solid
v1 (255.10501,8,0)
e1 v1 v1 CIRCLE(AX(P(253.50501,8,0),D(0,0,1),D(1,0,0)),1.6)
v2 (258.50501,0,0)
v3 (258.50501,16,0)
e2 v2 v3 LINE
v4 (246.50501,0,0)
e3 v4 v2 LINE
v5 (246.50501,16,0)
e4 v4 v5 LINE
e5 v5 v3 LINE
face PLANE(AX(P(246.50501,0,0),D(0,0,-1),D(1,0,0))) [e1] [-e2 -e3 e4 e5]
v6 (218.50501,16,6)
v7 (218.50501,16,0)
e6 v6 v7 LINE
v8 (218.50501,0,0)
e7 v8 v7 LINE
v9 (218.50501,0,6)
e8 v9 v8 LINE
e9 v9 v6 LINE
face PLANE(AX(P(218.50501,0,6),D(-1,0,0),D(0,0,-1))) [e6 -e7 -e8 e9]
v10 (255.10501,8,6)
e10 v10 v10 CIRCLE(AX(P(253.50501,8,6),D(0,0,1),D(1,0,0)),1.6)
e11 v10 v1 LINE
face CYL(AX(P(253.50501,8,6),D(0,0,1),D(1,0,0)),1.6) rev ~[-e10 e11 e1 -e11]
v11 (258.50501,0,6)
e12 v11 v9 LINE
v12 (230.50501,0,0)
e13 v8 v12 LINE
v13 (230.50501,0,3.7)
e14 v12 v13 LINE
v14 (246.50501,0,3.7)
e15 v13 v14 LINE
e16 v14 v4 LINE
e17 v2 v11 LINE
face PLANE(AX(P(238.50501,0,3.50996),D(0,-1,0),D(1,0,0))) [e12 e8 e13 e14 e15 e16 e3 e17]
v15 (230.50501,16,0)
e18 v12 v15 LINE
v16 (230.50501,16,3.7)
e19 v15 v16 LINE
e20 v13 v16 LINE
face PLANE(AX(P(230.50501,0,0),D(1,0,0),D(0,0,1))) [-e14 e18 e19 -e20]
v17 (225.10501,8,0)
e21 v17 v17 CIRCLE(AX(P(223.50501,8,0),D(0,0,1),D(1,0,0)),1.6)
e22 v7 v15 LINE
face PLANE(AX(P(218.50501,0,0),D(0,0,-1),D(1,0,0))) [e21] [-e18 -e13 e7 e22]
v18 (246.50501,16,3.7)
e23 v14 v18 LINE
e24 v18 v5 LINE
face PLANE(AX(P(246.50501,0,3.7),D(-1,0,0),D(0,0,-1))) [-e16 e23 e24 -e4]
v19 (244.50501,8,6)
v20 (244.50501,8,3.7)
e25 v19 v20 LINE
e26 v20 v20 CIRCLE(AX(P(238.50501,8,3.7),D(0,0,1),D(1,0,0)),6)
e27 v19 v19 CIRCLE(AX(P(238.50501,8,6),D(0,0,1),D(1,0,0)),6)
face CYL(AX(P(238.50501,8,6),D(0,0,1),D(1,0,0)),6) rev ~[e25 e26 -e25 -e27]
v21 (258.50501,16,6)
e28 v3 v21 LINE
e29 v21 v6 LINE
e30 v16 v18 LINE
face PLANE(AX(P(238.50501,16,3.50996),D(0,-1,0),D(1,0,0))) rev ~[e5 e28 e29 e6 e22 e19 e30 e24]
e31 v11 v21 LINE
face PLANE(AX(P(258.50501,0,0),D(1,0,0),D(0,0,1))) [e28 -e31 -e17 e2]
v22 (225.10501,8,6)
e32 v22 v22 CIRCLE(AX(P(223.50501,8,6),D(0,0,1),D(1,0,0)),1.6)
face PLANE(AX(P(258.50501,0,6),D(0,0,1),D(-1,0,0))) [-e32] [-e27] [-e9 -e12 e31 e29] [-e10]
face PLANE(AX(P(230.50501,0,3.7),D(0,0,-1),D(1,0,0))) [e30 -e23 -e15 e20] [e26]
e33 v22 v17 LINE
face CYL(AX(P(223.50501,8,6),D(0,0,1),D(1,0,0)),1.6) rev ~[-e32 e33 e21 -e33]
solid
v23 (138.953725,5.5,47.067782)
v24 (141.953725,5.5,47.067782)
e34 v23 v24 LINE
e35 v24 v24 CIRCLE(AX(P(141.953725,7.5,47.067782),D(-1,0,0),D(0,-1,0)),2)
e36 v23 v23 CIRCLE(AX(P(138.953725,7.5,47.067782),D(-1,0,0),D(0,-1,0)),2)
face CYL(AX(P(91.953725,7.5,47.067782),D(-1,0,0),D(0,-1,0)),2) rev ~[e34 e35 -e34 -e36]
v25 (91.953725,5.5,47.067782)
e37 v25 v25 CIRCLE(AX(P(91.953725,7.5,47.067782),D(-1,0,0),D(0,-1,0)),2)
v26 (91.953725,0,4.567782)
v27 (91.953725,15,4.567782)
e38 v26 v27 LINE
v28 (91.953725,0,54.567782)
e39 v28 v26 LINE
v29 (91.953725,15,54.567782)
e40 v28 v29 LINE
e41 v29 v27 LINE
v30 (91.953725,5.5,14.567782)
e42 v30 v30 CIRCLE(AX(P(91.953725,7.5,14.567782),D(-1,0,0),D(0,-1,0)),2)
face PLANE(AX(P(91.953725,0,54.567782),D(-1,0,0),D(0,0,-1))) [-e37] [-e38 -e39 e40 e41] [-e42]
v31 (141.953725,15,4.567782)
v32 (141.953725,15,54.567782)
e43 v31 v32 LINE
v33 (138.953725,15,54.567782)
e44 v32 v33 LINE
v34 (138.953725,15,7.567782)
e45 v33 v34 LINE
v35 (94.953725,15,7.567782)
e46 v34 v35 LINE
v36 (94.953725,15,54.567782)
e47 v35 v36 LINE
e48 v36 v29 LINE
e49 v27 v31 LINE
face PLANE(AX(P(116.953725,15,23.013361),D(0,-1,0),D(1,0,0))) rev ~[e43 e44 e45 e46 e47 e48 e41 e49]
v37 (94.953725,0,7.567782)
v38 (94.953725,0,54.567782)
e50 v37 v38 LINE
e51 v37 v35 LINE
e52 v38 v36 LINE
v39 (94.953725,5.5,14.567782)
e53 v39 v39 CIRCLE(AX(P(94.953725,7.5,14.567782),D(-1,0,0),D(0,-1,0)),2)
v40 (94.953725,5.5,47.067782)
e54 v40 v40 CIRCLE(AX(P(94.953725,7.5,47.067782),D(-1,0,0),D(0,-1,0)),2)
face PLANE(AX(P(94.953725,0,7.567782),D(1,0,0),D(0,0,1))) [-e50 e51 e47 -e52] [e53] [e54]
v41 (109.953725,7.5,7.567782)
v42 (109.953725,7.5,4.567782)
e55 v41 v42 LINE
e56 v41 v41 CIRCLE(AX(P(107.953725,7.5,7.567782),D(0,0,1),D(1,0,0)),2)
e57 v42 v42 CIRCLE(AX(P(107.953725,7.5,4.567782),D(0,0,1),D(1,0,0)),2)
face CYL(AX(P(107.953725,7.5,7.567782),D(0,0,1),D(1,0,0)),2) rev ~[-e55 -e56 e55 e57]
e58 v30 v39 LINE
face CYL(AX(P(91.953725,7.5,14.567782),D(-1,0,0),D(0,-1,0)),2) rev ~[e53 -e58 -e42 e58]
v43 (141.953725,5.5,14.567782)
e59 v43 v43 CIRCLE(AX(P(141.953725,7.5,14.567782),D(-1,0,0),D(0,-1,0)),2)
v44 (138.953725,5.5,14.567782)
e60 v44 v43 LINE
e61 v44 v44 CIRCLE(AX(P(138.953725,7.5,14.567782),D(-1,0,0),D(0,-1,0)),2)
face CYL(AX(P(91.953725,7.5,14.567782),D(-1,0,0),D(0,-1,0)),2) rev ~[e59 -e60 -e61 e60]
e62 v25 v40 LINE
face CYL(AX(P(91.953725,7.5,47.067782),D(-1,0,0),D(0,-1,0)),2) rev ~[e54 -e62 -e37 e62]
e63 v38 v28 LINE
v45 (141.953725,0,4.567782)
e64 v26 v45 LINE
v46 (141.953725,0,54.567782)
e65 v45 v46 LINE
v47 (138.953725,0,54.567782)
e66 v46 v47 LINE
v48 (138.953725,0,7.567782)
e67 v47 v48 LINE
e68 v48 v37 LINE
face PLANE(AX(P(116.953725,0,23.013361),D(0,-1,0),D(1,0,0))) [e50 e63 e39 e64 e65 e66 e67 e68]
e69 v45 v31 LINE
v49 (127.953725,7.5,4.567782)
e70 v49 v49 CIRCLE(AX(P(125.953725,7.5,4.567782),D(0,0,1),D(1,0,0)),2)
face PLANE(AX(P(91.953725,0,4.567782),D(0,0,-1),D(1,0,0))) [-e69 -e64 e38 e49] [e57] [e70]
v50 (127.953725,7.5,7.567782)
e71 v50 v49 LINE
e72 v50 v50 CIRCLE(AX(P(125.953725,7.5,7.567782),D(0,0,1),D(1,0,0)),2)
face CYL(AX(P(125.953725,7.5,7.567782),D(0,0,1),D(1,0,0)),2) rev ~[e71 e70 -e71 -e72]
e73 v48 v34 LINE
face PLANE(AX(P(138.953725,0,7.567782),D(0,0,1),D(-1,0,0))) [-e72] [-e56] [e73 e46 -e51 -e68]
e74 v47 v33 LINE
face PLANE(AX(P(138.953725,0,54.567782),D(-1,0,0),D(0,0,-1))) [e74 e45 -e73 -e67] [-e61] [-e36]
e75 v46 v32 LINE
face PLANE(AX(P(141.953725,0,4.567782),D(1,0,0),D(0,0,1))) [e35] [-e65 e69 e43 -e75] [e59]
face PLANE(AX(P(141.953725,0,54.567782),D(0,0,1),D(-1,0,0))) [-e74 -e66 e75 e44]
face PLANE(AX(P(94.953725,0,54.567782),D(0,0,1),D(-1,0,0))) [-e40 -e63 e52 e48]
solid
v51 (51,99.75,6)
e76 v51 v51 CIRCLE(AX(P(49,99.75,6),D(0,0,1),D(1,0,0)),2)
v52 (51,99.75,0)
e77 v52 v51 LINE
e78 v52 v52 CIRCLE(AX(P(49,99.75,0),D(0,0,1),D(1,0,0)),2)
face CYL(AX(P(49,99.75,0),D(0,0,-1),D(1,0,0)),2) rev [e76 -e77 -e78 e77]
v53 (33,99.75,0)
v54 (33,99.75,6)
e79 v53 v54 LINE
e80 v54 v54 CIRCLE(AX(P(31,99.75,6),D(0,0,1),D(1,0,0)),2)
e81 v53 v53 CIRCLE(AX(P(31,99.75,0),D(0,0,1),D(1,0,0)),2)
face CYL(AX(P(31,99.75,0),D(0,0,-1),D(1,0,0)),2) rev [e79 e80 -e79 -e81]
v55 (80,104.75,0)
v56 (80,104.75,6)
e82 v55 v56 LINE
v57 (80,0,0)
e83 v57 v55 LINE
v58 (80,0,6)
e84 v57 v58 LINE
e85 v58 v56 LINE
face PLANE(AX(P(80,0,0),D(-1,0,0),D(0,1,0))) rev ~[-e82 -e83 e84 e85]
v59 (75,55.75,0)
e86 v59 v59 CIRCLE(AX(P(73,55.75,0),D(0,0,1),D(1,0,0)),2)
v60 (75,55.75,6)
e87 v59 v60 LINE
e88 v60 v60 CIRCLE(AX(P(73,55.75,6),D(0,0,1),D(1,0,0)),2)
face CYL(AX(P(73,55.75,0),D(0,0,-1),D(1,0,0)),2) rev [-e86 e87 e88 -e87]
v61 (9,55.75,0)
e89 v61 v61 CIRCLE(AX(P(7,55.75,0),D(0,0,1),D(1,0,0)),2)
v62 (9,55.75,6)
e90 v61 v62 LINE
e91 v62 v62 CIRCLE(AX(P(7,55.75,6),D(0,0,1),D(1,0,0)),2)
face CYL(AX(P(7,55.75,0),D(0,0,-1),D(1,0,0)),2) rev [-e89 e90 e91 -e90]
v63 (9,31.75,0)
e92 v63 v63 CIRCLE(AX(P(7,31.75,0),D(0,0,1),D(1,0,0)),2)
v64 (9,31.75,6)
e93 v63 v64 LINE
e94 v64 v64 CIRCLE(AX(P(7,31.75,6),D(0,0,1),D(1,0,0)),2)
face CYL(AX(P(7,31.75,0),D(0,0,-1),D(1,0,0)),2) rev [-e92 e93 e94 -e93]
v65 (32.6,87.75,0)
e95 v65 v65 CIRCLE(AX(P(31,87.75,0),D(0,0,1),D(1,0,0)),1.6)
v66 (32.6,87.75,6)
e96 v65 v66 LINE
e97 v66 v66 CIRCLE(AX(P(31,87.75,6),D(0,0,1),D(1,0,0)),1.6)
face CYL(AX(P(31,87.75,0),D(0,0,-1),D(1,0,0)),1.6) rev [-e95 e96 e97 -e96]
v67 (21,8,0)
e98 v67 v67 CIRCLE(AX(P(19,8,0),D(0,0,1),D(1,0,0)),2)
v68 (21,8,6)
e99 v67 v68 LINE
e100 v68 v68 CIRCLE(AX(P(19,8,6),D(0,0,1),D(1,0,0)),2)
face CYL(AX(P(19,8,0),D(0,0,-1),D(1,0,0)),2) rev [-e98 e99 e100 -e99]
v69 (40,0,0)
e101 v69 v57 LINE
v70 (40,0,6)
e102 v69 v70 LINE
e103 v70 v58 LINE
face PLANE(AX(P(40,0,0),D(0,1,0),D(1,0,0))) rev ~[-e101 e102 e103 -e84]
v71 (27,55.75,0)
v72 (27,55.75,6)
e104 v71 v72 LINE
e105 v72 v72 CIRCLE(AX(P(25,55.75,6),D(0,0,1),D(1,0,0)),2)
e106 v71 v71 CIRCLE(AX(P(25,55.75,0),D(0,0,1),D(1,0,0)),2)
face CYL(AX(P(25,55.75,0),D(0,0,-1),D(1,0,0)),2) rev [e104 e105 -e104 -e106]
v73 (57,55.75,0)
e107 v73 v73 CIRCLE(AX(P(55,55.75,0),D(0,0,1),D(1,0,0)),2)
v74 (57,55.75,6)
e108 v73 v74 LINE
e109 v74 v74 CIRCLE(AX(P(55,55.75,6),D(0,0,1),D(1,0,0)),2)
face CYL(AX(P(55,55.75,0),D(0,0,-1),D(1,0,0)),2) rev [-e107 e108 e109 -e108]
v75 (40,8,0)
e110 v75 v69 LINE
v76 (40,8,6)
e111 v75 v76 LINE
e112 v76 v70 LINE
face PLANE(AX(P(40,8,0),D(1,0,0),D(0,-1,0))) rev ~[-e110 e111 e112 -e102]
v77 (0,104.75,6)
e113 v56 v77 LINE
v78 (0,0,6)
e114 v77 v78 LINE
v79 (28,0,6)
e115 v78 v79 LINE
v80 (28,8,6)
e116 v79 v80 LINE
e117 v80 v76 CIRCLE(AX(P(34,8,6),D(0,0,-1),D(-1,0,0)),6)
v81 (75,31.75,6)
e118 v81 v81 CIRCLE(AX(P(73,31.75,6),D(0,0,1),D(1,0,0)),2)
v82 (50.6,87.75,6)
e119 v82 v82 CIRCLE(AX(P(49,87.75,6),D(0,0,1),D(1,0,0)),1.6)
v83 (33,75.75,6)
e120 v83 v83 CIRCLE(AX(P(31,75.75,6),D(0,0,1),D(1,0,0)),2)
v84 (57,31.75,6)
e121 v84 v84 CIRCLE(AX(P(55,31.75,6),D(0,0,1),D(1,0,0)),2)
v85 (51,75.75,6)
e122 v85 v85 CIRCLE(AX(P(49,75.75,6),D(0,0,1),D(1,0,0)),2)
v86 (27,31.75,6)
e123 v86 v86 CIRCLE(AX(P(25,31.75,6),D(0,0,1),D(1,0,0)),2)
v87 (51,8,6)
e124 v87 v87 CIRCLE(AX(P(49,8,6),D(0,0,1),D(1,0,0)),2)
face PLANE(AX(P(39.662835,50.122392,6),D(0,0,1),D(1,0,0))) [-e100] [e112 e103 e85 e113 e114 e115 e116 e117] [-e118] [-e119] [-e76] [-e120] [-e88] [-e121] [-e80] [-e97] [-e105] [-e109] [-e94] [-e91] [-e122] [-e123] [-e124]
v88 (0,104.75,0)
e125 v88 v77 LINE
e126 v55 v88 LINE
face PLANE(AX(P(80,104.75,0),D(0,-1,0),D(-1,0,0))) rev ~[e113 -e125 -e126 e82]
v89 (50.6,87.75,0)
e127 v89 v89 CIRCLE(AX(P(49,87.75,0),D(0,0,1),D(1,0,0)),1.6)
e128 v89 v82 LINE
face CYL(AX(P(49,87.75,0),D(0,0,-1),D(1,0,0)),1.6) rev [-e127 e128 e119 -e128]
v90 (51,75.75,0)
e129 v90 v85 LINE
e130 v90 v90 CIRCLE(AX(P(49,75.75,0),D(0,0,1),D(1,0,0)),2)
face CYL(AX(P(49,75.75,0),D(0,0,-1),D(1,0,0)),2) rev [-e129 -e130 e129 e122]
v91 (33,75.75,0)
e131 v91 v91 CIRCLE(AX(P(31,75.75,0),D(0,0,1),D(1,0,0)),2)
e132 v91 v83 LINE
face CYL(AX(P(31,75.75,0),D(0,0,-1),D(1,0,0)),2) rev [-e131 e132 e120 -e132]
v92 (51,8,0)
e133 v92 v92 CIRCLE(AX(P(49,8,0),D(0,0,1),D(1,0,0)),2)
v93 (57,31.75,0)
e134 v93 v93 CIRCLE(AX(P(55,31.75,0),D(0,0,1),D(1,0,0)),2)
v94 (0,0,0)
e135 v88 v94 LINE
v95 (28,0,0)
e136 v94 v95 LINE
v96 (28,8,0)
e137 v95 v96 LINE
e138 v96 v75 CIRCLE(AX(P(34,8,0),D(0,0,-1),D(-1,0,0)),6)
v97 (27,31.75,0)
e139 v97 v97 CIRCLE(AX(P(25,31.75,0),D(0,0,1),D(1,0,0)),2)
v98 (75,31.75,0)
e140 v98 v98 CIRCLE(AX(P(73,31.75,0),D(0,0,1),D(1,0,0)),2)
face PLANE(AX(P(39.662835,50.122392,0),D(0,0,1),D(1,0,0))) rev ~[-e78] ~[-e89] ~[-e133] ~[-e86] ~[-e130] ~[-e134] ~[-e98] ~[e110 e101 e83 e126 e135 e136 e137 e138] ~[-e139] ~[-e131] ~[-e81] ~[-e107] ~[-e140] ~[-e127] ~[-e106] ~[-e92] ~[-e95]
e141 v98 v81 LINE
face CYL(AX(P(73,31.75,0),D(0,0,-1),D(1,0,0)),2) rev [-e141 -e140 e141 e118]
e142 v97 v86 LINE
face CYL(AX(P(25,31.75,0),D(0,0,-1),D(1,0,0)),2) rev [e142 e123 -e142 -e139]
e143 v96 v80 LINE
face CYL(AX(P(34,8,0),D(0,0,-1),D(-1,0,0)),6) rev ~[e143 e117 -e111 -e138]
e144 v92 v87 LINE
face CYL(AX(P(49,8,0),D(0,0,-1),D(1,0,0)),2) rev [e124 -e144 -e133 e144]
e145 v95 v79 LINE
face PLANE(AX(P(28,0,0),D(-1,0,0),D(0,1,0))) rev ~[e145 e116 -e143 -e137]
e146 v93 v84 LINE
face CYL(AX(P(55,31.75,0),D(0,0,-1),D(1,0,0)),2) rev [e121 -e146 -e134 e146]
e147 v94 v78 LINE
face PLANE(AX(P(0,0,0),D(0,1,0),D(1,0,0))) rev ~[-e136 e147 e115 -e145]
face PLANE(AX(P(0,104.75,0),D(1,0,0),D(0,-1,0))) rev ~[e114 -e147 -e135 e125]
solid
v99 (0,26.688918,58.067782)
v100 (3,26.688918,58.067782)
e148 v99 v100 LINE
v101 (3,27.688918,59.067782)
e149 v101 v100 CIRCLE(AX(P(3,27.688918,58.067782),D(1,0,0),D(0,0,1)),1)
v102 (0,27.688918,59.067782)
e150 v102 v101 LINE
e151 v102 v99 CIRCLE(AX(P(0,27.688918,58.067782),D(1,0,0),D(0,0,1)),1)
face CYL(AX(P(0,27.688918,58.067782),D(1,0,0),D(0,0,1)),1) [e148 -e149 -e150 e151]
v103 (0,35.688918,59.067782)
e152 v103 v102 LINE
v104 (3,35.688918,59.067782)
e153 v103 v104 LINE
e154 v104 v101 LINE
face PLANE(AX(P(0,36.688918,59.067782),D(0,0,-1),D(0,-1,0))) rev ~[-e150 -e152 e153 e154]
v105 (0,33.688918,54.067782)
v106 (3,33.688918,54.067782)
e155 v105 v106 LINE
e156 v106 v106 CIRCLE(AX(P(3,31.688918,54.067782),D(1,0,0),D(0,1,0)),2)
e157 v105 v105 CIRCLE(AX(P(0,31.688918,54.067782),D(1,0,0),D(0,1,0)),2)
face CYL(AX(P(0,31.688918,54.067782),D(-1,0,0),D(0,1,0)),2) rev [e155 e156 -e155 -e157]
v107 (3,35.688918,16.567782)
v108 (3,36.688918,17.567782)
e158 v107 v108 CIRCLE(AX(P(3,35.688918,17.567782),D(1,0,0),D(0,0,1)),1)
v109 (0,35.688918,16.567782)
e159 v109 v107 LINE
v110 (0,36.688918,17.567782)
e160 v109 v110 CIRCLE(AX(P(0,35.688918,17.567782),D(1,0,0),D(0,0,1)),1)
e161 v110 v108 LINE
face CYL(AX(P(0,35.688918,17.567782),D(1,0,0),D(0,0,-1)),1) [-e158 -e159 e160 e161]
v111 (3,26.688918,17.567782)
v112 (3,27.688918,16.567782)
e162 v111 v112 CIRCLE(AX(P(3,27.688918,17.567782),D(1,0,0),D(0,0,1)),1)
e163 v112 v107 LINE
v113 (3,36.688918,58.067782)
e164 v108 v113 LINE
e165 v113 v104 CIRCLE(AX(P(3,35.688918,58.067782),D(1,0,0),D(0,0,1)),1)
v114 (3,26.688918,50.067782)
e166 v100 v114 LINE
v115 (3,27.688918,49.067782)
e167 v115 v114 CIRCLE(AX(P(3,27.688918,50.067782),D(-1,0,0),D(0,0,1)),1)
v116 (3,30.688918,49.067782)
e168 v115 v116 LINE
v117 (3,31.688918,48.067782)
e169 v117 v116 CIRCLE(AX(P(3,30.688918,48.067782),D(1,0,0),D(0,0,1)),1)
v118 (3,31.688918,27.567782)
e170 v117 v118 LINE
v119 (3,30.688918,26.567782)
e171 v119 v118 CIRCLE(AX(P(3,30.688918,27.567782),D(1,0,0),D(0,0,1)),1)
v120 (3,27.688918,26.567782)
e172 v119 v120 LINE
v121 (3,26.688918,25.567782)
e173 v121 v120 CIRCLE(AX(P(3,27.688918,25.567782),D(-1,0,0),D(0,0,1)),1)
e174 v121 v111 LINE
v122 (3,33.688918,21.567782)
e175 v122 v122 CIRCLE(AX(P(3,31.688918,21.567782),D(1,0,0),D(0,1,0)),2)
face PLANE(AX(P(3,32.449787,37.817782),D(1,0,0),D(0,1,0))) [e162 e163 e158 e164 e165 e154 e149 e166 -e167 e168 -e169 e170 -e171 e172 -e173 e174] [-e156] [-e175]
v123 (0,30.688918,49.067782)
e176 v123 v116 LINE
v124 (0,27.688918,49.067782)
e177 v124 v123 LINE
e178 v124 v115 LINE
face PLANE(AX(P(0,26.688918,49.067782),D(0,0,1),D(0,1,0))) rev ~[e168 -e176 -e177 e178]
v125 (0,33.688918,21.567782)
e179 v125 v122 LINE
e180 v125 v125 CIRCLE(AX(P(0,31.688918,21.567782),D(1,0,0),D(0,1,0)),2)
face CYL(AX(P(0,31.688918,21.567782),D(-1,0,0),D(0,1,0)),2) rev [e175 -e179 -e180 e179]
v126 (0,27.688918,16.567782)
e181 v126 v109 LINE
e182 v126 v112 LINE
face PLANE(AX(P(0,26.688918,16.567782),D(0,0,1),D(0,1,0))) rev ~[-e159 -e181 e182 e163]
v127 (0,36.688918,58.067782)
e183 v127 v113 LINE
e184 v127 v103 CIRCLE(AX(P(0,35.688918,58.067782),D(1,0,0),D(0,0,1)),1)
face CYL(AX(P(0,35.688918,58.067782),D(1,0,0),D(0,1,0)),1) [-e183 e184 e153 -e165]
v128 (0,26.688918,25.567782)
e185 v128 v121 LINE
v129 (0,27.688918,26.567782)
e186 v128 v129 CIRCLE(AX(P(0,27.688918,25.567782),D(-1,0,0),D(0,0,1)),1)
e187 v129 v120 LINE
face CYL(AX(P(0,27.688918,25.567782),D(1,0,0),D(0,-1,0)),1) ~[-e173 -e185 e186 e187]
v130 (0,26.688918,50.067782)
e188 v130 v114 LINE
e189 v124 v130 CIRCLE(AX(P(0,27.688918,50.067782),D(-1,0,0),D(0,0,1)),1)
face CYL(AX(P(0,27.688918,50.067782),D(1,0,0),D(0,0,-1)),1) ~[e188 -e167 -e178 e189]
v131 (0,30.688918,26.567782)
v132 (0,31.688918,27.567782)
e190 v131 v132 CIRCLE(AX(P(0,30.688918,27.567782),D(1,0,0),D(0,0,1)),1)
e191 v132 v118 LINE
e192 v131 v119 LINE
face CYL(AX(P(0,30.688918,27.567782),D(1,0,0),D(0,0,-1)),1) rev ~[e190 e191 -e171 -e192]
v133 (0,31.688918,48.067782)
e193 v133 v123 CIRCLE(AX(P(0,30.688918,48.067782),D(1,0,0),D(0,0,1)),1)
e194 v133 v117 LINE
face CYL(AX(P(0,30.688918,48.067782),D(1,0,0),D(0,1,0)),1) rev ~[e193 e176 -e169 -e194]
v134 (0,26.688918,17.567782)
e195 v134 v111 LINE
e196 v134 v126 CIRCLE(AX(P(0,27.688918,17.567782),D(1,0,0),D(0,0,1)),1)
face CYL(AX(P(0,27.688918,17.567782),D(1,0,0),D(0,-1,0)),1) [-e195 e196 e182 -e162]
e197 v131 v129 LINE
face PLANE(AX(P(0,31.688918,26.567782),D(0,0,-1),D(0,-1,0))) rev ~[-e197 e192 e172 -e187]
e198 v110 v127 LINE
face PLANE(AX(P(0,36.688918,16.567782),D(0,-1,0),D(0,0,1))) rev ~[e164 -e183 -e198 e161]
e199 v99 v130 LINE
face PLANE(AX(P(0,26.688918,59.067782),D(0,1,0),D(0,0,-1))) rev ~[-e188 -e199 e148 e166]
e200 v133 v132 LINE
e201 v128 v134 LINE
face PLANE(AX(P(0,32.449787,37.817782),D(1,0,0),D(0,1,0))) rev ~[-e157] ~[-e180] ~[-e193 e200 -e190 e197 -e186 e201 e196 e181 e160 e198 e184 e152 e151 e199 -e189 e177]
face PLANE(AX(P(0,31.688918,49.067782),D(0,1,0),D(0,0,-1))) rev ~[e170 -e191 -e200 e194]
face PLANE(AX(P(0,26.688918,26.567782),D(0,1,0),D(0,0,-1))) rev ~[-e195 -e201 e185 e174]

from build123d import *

# Parameters (mm, degrees)
F1_DEPTH  = 15
F3_R      = 2
F4_DEPTH  = 50.001
F2_R      = 2
F5_DEPTH  = 3
F6_R      = 2
F7_DEPTH  = 3
F8_R      = 1
F9_R      = 2
F9_R_2    = 1.6
F10_DEPTH = 6
F11_R     = 2
F12_DEPTH = 6
F14_DEPTH = 16
F15_R     = 1.6
F15_R_2   = 6
F16_DEPTH = 6.001


# Not quite as in the source:
# - a feature names something its author has since deleted; it is built from what else it names


with BuildPart() as f1:
    # F0 (on Front) → F1 (new body)
    with BuildSketch(Plane.XZ):
        Polygon((91.9537246227, 54.5677823946), (91.9537246227, 4.5677823946), (116.9537246227, 4.5677823946), (141.9537246227, 4.5677823946), (141.9537246227, 54.5677823946), (138.9537246227, 54.5677823946), (138.9537246227, 7.5677823946), (116.9537246227, 7.5677823946), (94.9537246227, 7.5677823946), (94.9537246227, 54.5677823946), align=None)
    extrude(amount=-F1_DEPTH)

    # F3 (on face) → F4 (cut, through all)
    with BuildSketch(Plane(origin=(91.9537246227, 0, 0), x_dir=(0, -1, 0), z_dir=(-1, 0, 0))):
        with Locations((-7.5, 47.0677823946)):
            Circle(F3_R)
        with Locations((-7.5, 14.5677823946)):
            Circle(F3_R)
    extrude(amount=-F4_DEPTH, mode=Mode.SUBTRACT)

    # F2 (on face) → F5 (cut, through all)
    with BuildSketch(Plane.XY.offset(7.5677823946)):
        with Locations((107.9537246227, 7.5)):
            Circle(F2_R)
        with Locations((125.9537246227, 7.5)):
            Circle(F2_R)
    extrude(amount=-F5_DEPTH, mode=Mode.SUBTRACT)


with BuildPart() as f7:
    # F6 (on Right) → F7 (new body)
    with BuildSketch(Plane.YZ):
        Polygon((26.6889177019, 26.5677823946), (26.6889177019, 16.5677823946), (36.6889177019, 16.5677823946), (36.6889177019, 59.0677823946), (26.6889177019, 59.0677823946), (26.6889177019, 49.0677823946), (31.6889177019, 49.0677823946), (31.6889177019, 26.5677823946), align=None)
        with Locations((31.6889177019, 21.5677823946)):
            Circle(F6_R, mode=Mode.SUBTRACT)
        with Locations((31.6889177019, 54.0677823946)):
            Circle(F6_R, mode=Mode.SUBTRACT)
    extrude(amount=F7_DEPTH)

    # F8
    f8_edges = [f7.edges().sort_by_distance(p)[0] for p in [
        (1.5, 26.688918, 26.567782),
        (1.5, 26.688918, 16.567782),
        (1.5, 36.688918, 16.567782),
        (1.5, 31.688918, 26.567782),
        (1.5, 31.688918, 49.067782),
        (1.5, 26.688918, 59.067782),
        (1.5, 36.688918, 59.067782),
        (1.5, 26.688918, 49.067782),
    ]]
    fillet(f8_edges, radius=F8_R)


with BuildPart() as f10:
    # F9 (on Top) → F10 (new body)
    with BuildSketch(Plane.XY):
        with BuildLine():
            Line((0, 104.75), (0, 0))
            Line((0, 0), (28, 0))
            Line((28, 0), (28, 8))
            ThreePointArc((28, 8), (34, 14), (40, 8))
            Line((40, 8), (40, 0))
            Line((40, 0), (80, 0))
            Line((80, 0), (80, 104.75))
            Line((80, 104.75), (0, 104.75))
        make_face()
        with Locations((19, 8)):
            Circle(F9_R, mode=Mode.SUBTRACT)
        with Locations((7, 31.75)):
            Circle(F9_R, mode=Mode.SUBTRACT)
        with Locations((25, 31.75)):
            Circle(F9_R, mode=Mode.SUBTRACT)
        with Locations((49, 8)):
            Circle(F9_R, mode=Mode.SUBTRACT)
        with Locations((55, 31.75)):
            Circle(F9_R, mode=Mode.SUBTRACT)
        with Locations((73, 31.75)):
            Circle(F9_R, mode=Mode.SUBTRACT)
        with Locations((7, 55.75)):
            Circle(F9_R, mode=Mode.SUBTRACT)
        with Locations((25, 55.75)):
            Circle(F9_R, mode=Mode.SUBTRACT)
        with Locations((31, 75.75)):
            Circle(F9_R, mode=Mode.SUBTRACT)
        with Locations((31, 87.75)):
            Circle(F9_R_2, mode=Mode.SUBTRACT)
        with Locations((31, 99.75)):
            Circle(F9_R, mode=Mode.SUBTRACT)
        with Locations((55, 55.75)):
            Circle(F9_R, mode=Mode.SUBTRACT)
        with Locations((49, 75.75)):
            Circle(F9_R, mode=Mode.SUBTRACT)
        with Locations((73, 55.75)):
            Circle(F9_R, mode=Mode.SUBTRACT)
        with Locations((49, 87.75)):
            Circle(F9_R_2, mode=Mode.SUBTRACT)
        with Locations((49, 99.75)):
            Circle(F9_R, mode=Mode.SUBTRACT)
    extrude(amount=F10_DEPTH)


with BuildPart() as f12:
    # F11 (on Top) → F12 (new body)
    with BuildSketch(Plane.XY):
        with BuildLine():
            Line((104.3827744635, 71.6418235004), (95.3343725204, 71.6418235004))
            Line((95.3343725204, 71.6418235004), (95.3343725204, 61.6418235004))
            Line((95.3343725204, 61.6418235004), (115.3343725204, 61.6418235004))
            Line((115.3343725204, 61.6418235004), (115.3343725204, 66.8918235004))
            ThreePointArc((115.3343725204, 66.8918235004), (109.3657043273, 68.1304645559), (104.3827744635, 71.6418235004))
        make_face()
        with Locations((100.3343725204, 66.6418235004)):
            Circle(F11_R, mode=Mode.SUBTRACT)
        with BuildLine():
            ThreePointArc((126.2859705774, 71.6418235004), (121.3030407136, 68.1304645559), (115.3343725204, 66.8918235004))
            Line((115.3343725204, 66.8918235004), (115.3343725204, 61.6418235004))
            Line((115.3343725204, 61.6418235004), (135.3343725204, 61.6418235004))
            Line((135.3343725204, 61.6418235004), (135.3343725204, 71.6418235004))
            Line((135.3343725204, 71.6418235004), (126.2859705774, 71.6418235004))
        make_face()
        with Locations((130.3343725204, 66.6418235004)):
            Circle(F11_R, mode=Mode.SUBTRACT)
    extrude(amount=F12_DEPTH)


with BuildPart() as f14:
    # F13 (on Front) → F14 (new body)
    with BuildSketch(Plane.XZ):
        Polygon((218.5050100088, 6), (218.5050100088, 0), (230.5050100088, 0), (230.5050100088, 3.7), (246.5050100088, 3.7), (246.5050100088, 0), (258.5050100088, 0), (258.5050100088, 6), align=None)
    extrude(amount=-F14_DEPTH)

    # F15 (on face) → F16 (cut, through all)
    with BuildSketch(Plane.XY.offset(6)):
        with Locations((223.5050100088, 8)):
            Circle(F15_R)
        with Locations((238.5050100088, 8)):
            Circle(F15_R_2)
        with Locations((253.5050100088, 8)):
            Circle(F15_R)
    extrude(amount=-F16_DEPTH, mode=Mode.SUBTRACT)


solid = Compound([f1.part, f7.part, f10.part, f14.part])
